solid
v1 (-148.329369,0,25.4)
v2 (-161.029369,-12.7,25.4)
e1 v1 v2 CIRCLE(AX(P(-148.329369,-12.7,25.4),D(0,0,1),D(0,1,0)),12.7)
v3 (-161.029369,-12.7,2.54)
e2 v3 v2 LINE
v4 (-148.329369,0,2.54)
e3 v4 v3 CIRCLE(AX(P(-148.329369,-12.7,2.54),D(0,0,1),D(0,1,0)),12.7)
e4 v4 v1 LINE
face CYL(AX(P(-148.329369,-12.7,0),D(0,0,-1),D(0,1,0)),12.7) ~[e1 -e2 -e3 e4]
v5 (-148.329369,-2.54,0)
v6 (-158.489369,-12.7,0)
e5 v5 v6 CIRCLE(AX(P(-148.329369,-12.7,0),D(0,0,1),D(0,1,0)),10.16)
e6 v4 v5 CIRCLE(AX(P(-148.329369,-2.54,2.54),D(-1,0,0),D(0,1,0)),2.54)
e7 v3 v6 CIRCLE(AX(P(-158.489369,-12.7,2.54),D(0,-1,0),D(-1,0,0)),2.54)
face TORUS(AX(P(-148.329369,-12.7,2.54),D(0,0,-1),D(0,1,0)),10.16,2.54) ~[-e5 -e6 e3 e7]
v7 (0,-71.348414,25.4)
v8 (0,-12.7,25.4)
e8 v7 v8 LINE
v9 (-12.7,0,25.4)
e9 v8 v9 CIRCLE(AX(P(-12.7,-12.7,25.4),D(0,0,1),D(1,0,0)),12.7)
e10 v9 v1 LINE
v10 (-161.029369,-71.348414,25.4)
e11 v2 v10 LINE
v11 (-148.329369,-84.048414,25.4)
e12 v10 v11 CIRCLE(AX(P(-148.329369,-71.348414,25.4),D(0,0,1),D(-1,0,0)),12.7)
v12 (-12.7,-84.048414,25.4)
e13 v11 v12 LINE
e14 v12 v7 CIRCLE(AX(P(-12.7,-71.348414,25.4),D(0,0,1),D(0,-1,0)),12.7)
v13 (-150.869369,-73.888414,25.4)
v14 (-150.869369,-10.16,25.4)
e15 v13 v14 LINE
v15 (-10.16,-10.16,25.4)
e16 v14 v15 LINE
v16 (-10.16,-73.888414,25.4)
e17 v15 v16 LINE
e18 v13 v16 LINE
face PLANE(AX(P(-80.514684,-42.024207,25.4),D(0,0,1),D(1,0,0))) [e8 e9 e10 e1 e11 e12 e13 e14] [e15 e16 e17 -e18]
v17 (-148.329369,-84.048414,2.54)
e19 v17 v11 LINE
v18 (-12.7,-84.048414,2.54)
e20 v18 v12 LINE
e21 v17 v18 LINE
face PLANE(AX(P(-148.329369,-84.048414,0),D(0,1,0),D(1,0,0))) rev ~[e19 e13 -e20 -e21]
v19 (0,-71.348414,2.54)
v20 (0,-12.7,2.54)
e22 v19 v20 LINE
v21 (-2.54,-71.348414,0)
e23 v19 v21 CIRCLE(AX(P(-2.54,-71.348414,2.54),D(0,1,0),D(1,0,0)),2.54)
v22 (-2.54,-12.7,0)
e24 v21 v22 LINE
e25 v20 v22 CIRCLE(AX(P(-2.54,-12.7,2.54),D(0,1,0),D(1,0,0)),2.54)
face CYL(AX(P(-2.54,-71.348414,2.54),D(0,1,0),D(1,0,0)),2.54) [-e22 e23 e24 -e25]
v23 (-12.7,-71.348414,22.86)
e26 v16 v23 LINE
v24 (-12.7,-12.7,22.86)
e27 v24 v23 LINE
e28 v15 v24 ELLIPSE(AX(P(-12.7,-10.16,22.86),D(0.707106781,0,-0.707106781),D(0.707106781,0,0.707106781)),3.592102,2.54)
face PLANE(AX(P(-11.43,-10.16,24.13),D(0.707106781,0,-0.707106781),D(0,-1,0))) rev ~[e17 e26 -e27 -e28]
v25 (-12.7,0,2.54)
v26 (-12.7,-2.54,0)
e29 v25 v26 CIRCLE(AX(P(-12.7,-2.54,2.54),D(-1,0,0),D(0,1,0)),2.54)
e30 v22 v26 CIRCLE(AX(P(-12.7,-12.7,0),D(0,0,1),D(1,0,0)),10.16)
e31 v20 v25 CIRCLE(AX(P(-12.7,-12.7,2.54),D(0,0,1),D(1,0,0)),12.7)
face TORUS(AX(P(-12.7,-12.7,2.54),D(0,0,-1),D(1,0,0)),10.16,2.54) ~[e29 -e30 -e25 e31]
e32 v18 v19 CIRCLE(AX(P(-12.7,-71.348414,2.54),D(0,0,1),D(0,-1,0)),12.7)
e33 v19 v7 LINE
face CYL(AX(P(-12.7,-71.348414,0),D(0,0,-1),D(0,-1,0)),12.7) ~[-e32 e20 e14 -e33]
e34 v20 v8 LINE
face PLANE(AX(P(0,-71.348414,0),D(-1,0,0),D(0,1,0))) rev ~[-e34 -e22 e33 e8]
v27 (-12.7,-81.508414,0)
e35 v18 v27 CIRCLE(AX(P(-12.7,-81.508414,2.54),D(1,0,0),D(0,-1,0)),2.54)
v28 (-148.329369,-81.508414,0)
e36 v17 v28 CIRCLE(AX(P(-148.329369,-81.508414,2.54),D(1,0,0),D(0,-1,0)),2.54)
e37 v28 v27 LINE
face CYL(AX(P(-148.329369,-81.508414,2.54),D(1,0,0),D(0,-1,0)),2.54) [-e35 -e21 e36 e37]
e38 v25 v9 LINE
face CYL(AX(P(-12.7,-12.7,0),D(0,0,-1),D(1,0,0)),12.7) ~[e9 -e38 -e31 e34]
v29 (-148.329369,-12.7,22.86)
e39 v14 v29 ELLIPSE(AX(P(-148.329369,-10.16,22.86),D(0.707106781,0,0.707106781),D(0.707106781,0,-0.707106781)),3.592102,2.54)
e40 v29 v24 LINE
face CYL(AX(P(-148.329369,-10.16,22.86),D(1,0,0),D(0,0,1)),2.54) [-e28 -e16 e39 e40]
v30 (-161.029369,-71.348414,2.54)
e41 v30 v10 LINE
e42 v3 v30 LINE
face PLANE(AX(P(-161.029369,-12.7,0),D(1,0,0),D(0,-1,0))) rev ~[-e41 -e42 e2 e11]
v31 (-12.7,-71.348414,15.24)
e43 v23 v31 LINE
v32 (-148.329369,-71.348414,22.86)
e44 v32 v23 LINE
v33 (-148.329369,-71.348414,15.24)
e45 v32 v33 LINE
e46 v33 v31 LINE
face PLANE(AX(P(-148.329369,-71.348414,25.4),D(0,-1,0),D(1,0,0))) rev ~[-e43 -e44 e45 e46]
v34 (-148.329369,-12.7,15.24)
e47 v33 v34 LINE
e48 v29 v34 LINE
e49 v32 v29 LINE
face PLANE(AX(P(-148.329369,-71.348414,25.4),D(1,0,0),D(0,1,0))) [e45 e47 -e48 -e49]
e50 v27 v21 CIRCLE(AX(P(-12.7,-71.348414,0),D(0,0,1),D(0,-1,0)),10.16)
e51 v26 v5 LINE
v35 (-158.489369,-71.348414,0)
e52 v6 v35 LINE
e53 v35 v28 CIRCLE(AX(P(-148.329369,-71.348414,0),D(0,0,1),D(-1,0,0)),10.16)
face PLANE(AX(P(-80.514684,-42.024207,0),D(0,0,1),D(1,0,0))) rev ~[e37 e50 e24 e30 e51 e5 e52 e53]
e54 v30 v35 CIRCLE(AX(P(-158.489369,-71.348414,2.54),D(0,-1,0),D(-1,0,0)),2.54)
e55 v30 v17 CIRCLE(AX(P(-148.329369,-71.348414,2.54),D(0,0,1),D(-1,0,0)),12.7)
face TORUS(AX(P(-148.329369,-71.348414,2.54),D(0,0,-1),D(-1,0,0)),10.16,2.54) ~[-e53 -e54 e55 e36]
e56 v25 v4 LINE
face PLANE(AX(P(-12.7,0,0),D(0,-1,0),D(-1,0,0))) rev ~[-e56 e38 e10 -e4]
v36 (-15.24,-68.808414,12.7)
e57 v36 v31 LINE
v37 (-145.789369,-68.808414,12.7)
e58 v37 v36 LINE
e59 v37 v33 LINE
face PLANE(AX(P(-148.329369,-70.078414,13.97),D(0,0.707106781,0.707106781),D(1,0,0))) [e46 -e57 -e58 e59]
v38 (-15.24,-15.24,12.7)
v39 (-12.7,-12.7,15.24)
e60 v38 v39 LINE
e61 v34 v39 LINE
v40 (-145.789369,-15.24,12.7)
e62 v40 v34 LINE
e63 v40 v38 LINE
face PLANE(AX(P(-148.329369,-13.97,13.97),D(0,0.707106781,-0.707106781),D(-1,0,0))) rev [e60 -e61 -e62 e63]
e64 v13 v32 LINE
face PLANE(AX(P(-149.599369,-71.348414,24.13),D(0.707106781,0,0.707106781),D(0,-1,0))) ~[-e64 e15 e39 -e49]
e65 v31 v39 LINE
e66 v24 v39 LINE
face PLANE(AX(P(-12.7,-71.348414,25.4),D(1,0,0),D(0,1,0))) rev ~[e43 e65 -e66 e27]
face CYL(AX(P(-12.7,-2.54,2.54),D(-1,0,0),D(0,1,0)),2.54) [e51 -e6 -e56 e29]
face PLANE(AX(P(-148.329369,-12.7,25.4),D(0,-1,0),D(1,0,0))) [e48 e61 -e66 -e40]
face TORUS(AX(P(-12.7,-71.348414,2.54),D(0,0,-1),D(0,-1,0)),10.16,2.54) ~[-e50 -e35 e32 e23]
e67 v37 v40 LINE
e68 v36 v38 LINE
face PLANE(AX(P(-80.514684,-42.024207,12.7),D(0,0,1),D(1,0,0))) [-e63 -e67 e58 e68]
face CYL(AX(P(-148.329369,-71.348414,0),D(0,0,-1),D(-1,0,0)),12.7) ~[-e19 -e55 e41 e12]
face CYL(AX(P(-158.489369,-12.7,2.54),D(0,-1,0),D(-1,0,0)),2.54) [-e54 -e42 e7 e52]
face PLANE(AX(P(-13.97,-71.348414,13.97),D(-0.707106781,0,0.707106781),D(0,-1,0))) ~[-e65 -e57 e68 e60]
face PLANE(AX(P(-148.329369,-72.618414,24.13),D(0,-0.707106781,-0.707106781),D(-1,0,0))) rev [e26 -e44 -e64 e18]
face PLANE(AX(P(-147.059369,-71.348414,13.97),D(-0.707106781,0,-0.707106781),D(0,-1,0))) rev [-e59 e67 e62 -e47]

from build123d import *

# Parameters (mm, degrees)
F1_DEPTH = 25.4
F2_W     = 135.629368639
F2_H     = 58.648413825
F3_DEPTH = 12.7
F4_R     = 2.54
F5_SIZE  = 2.54


with BuildPart() as f1:
    # F0 (on Top) → F1 (new body)
    with BuildSketch(Plane.XY):
        with BuildLine():
            Line((-12.7, 0), (-148.329368639, 0))
            ThreePointArc((-148.329368639, 0), (-157.3096247601, -3.7197438789), (-161.029368639, -12.7))
            Line((-161.029368639, -12.7), (-161.029368639, -71.348413825))
            ThreePointArc((-161.029368639, -71.348413825), (-157.3096247601, -80.3286699461), (-148.329368639, -84.048413825))
            Line((-148.329368639, -84.048413825), (-12.7, -84.048413825))
            ThreePointArc((-12.7, -84.048413825), (-3.7197438789, -80.3286699461), (0, -71.348413825))
            Line((0, -71.348413825), (0, -12.7))
            ThreePointArc((0, -12.7), (-3.7197438789, -3.7197438789), (-12.7, 0))
        make_face()
    extrude(amount=F1_DEPTH)

    # F2 (on face) → F3 (cut)
    with BuildSketch(Plane.XY.offset(25.4)):
        with Locations((-80.5146843195, -42.0242069125)):
            Rectangle(F2_W, F2_H)
    extrude(amount=-F3_DEPTH, mode=Mode.SUBTRACT)

    # F4
    f4_edges = [f1.edges().sort_by_distance(p)[0] for p in [
        (-80.514684, -12.7, 25.4),
        (-80.514684, 0, 0),
        (-157.309625, -3.719744, 0),
        (-161.029369, -42.024207, 0),
        (-157.309625, -80.32867, 0),
        (-80.514684, -84.048414, 0),
        (-3.719744, -80.32867, 0),
        (0, -42.024207, 0),
        (-3.719744, -3.719744, 0),
    ]]
    fillet(f4_edges, radius=F4_R)

    # F5
    f5_edges = [f1.edges().sort_by_distance(p)[0] for p in [
        (-12.7, -42.024207, 12.7),
        (-80.514684, -12.7, 12.7),
        (-148.329369, -42.024207, 12.7),
        (-80.514684, -71.348414, 12.7),
        (-80.514684, -10.16, 25.4),
        (-148.329369, -42.024207, 25.4),
        (-80.514684, -71.348414, 25.4),
        (-12.7, -42.024207, 25.4),
    ]]
    chamfer(f5_edges, length=F5_SIZE)


solid = f1.part
